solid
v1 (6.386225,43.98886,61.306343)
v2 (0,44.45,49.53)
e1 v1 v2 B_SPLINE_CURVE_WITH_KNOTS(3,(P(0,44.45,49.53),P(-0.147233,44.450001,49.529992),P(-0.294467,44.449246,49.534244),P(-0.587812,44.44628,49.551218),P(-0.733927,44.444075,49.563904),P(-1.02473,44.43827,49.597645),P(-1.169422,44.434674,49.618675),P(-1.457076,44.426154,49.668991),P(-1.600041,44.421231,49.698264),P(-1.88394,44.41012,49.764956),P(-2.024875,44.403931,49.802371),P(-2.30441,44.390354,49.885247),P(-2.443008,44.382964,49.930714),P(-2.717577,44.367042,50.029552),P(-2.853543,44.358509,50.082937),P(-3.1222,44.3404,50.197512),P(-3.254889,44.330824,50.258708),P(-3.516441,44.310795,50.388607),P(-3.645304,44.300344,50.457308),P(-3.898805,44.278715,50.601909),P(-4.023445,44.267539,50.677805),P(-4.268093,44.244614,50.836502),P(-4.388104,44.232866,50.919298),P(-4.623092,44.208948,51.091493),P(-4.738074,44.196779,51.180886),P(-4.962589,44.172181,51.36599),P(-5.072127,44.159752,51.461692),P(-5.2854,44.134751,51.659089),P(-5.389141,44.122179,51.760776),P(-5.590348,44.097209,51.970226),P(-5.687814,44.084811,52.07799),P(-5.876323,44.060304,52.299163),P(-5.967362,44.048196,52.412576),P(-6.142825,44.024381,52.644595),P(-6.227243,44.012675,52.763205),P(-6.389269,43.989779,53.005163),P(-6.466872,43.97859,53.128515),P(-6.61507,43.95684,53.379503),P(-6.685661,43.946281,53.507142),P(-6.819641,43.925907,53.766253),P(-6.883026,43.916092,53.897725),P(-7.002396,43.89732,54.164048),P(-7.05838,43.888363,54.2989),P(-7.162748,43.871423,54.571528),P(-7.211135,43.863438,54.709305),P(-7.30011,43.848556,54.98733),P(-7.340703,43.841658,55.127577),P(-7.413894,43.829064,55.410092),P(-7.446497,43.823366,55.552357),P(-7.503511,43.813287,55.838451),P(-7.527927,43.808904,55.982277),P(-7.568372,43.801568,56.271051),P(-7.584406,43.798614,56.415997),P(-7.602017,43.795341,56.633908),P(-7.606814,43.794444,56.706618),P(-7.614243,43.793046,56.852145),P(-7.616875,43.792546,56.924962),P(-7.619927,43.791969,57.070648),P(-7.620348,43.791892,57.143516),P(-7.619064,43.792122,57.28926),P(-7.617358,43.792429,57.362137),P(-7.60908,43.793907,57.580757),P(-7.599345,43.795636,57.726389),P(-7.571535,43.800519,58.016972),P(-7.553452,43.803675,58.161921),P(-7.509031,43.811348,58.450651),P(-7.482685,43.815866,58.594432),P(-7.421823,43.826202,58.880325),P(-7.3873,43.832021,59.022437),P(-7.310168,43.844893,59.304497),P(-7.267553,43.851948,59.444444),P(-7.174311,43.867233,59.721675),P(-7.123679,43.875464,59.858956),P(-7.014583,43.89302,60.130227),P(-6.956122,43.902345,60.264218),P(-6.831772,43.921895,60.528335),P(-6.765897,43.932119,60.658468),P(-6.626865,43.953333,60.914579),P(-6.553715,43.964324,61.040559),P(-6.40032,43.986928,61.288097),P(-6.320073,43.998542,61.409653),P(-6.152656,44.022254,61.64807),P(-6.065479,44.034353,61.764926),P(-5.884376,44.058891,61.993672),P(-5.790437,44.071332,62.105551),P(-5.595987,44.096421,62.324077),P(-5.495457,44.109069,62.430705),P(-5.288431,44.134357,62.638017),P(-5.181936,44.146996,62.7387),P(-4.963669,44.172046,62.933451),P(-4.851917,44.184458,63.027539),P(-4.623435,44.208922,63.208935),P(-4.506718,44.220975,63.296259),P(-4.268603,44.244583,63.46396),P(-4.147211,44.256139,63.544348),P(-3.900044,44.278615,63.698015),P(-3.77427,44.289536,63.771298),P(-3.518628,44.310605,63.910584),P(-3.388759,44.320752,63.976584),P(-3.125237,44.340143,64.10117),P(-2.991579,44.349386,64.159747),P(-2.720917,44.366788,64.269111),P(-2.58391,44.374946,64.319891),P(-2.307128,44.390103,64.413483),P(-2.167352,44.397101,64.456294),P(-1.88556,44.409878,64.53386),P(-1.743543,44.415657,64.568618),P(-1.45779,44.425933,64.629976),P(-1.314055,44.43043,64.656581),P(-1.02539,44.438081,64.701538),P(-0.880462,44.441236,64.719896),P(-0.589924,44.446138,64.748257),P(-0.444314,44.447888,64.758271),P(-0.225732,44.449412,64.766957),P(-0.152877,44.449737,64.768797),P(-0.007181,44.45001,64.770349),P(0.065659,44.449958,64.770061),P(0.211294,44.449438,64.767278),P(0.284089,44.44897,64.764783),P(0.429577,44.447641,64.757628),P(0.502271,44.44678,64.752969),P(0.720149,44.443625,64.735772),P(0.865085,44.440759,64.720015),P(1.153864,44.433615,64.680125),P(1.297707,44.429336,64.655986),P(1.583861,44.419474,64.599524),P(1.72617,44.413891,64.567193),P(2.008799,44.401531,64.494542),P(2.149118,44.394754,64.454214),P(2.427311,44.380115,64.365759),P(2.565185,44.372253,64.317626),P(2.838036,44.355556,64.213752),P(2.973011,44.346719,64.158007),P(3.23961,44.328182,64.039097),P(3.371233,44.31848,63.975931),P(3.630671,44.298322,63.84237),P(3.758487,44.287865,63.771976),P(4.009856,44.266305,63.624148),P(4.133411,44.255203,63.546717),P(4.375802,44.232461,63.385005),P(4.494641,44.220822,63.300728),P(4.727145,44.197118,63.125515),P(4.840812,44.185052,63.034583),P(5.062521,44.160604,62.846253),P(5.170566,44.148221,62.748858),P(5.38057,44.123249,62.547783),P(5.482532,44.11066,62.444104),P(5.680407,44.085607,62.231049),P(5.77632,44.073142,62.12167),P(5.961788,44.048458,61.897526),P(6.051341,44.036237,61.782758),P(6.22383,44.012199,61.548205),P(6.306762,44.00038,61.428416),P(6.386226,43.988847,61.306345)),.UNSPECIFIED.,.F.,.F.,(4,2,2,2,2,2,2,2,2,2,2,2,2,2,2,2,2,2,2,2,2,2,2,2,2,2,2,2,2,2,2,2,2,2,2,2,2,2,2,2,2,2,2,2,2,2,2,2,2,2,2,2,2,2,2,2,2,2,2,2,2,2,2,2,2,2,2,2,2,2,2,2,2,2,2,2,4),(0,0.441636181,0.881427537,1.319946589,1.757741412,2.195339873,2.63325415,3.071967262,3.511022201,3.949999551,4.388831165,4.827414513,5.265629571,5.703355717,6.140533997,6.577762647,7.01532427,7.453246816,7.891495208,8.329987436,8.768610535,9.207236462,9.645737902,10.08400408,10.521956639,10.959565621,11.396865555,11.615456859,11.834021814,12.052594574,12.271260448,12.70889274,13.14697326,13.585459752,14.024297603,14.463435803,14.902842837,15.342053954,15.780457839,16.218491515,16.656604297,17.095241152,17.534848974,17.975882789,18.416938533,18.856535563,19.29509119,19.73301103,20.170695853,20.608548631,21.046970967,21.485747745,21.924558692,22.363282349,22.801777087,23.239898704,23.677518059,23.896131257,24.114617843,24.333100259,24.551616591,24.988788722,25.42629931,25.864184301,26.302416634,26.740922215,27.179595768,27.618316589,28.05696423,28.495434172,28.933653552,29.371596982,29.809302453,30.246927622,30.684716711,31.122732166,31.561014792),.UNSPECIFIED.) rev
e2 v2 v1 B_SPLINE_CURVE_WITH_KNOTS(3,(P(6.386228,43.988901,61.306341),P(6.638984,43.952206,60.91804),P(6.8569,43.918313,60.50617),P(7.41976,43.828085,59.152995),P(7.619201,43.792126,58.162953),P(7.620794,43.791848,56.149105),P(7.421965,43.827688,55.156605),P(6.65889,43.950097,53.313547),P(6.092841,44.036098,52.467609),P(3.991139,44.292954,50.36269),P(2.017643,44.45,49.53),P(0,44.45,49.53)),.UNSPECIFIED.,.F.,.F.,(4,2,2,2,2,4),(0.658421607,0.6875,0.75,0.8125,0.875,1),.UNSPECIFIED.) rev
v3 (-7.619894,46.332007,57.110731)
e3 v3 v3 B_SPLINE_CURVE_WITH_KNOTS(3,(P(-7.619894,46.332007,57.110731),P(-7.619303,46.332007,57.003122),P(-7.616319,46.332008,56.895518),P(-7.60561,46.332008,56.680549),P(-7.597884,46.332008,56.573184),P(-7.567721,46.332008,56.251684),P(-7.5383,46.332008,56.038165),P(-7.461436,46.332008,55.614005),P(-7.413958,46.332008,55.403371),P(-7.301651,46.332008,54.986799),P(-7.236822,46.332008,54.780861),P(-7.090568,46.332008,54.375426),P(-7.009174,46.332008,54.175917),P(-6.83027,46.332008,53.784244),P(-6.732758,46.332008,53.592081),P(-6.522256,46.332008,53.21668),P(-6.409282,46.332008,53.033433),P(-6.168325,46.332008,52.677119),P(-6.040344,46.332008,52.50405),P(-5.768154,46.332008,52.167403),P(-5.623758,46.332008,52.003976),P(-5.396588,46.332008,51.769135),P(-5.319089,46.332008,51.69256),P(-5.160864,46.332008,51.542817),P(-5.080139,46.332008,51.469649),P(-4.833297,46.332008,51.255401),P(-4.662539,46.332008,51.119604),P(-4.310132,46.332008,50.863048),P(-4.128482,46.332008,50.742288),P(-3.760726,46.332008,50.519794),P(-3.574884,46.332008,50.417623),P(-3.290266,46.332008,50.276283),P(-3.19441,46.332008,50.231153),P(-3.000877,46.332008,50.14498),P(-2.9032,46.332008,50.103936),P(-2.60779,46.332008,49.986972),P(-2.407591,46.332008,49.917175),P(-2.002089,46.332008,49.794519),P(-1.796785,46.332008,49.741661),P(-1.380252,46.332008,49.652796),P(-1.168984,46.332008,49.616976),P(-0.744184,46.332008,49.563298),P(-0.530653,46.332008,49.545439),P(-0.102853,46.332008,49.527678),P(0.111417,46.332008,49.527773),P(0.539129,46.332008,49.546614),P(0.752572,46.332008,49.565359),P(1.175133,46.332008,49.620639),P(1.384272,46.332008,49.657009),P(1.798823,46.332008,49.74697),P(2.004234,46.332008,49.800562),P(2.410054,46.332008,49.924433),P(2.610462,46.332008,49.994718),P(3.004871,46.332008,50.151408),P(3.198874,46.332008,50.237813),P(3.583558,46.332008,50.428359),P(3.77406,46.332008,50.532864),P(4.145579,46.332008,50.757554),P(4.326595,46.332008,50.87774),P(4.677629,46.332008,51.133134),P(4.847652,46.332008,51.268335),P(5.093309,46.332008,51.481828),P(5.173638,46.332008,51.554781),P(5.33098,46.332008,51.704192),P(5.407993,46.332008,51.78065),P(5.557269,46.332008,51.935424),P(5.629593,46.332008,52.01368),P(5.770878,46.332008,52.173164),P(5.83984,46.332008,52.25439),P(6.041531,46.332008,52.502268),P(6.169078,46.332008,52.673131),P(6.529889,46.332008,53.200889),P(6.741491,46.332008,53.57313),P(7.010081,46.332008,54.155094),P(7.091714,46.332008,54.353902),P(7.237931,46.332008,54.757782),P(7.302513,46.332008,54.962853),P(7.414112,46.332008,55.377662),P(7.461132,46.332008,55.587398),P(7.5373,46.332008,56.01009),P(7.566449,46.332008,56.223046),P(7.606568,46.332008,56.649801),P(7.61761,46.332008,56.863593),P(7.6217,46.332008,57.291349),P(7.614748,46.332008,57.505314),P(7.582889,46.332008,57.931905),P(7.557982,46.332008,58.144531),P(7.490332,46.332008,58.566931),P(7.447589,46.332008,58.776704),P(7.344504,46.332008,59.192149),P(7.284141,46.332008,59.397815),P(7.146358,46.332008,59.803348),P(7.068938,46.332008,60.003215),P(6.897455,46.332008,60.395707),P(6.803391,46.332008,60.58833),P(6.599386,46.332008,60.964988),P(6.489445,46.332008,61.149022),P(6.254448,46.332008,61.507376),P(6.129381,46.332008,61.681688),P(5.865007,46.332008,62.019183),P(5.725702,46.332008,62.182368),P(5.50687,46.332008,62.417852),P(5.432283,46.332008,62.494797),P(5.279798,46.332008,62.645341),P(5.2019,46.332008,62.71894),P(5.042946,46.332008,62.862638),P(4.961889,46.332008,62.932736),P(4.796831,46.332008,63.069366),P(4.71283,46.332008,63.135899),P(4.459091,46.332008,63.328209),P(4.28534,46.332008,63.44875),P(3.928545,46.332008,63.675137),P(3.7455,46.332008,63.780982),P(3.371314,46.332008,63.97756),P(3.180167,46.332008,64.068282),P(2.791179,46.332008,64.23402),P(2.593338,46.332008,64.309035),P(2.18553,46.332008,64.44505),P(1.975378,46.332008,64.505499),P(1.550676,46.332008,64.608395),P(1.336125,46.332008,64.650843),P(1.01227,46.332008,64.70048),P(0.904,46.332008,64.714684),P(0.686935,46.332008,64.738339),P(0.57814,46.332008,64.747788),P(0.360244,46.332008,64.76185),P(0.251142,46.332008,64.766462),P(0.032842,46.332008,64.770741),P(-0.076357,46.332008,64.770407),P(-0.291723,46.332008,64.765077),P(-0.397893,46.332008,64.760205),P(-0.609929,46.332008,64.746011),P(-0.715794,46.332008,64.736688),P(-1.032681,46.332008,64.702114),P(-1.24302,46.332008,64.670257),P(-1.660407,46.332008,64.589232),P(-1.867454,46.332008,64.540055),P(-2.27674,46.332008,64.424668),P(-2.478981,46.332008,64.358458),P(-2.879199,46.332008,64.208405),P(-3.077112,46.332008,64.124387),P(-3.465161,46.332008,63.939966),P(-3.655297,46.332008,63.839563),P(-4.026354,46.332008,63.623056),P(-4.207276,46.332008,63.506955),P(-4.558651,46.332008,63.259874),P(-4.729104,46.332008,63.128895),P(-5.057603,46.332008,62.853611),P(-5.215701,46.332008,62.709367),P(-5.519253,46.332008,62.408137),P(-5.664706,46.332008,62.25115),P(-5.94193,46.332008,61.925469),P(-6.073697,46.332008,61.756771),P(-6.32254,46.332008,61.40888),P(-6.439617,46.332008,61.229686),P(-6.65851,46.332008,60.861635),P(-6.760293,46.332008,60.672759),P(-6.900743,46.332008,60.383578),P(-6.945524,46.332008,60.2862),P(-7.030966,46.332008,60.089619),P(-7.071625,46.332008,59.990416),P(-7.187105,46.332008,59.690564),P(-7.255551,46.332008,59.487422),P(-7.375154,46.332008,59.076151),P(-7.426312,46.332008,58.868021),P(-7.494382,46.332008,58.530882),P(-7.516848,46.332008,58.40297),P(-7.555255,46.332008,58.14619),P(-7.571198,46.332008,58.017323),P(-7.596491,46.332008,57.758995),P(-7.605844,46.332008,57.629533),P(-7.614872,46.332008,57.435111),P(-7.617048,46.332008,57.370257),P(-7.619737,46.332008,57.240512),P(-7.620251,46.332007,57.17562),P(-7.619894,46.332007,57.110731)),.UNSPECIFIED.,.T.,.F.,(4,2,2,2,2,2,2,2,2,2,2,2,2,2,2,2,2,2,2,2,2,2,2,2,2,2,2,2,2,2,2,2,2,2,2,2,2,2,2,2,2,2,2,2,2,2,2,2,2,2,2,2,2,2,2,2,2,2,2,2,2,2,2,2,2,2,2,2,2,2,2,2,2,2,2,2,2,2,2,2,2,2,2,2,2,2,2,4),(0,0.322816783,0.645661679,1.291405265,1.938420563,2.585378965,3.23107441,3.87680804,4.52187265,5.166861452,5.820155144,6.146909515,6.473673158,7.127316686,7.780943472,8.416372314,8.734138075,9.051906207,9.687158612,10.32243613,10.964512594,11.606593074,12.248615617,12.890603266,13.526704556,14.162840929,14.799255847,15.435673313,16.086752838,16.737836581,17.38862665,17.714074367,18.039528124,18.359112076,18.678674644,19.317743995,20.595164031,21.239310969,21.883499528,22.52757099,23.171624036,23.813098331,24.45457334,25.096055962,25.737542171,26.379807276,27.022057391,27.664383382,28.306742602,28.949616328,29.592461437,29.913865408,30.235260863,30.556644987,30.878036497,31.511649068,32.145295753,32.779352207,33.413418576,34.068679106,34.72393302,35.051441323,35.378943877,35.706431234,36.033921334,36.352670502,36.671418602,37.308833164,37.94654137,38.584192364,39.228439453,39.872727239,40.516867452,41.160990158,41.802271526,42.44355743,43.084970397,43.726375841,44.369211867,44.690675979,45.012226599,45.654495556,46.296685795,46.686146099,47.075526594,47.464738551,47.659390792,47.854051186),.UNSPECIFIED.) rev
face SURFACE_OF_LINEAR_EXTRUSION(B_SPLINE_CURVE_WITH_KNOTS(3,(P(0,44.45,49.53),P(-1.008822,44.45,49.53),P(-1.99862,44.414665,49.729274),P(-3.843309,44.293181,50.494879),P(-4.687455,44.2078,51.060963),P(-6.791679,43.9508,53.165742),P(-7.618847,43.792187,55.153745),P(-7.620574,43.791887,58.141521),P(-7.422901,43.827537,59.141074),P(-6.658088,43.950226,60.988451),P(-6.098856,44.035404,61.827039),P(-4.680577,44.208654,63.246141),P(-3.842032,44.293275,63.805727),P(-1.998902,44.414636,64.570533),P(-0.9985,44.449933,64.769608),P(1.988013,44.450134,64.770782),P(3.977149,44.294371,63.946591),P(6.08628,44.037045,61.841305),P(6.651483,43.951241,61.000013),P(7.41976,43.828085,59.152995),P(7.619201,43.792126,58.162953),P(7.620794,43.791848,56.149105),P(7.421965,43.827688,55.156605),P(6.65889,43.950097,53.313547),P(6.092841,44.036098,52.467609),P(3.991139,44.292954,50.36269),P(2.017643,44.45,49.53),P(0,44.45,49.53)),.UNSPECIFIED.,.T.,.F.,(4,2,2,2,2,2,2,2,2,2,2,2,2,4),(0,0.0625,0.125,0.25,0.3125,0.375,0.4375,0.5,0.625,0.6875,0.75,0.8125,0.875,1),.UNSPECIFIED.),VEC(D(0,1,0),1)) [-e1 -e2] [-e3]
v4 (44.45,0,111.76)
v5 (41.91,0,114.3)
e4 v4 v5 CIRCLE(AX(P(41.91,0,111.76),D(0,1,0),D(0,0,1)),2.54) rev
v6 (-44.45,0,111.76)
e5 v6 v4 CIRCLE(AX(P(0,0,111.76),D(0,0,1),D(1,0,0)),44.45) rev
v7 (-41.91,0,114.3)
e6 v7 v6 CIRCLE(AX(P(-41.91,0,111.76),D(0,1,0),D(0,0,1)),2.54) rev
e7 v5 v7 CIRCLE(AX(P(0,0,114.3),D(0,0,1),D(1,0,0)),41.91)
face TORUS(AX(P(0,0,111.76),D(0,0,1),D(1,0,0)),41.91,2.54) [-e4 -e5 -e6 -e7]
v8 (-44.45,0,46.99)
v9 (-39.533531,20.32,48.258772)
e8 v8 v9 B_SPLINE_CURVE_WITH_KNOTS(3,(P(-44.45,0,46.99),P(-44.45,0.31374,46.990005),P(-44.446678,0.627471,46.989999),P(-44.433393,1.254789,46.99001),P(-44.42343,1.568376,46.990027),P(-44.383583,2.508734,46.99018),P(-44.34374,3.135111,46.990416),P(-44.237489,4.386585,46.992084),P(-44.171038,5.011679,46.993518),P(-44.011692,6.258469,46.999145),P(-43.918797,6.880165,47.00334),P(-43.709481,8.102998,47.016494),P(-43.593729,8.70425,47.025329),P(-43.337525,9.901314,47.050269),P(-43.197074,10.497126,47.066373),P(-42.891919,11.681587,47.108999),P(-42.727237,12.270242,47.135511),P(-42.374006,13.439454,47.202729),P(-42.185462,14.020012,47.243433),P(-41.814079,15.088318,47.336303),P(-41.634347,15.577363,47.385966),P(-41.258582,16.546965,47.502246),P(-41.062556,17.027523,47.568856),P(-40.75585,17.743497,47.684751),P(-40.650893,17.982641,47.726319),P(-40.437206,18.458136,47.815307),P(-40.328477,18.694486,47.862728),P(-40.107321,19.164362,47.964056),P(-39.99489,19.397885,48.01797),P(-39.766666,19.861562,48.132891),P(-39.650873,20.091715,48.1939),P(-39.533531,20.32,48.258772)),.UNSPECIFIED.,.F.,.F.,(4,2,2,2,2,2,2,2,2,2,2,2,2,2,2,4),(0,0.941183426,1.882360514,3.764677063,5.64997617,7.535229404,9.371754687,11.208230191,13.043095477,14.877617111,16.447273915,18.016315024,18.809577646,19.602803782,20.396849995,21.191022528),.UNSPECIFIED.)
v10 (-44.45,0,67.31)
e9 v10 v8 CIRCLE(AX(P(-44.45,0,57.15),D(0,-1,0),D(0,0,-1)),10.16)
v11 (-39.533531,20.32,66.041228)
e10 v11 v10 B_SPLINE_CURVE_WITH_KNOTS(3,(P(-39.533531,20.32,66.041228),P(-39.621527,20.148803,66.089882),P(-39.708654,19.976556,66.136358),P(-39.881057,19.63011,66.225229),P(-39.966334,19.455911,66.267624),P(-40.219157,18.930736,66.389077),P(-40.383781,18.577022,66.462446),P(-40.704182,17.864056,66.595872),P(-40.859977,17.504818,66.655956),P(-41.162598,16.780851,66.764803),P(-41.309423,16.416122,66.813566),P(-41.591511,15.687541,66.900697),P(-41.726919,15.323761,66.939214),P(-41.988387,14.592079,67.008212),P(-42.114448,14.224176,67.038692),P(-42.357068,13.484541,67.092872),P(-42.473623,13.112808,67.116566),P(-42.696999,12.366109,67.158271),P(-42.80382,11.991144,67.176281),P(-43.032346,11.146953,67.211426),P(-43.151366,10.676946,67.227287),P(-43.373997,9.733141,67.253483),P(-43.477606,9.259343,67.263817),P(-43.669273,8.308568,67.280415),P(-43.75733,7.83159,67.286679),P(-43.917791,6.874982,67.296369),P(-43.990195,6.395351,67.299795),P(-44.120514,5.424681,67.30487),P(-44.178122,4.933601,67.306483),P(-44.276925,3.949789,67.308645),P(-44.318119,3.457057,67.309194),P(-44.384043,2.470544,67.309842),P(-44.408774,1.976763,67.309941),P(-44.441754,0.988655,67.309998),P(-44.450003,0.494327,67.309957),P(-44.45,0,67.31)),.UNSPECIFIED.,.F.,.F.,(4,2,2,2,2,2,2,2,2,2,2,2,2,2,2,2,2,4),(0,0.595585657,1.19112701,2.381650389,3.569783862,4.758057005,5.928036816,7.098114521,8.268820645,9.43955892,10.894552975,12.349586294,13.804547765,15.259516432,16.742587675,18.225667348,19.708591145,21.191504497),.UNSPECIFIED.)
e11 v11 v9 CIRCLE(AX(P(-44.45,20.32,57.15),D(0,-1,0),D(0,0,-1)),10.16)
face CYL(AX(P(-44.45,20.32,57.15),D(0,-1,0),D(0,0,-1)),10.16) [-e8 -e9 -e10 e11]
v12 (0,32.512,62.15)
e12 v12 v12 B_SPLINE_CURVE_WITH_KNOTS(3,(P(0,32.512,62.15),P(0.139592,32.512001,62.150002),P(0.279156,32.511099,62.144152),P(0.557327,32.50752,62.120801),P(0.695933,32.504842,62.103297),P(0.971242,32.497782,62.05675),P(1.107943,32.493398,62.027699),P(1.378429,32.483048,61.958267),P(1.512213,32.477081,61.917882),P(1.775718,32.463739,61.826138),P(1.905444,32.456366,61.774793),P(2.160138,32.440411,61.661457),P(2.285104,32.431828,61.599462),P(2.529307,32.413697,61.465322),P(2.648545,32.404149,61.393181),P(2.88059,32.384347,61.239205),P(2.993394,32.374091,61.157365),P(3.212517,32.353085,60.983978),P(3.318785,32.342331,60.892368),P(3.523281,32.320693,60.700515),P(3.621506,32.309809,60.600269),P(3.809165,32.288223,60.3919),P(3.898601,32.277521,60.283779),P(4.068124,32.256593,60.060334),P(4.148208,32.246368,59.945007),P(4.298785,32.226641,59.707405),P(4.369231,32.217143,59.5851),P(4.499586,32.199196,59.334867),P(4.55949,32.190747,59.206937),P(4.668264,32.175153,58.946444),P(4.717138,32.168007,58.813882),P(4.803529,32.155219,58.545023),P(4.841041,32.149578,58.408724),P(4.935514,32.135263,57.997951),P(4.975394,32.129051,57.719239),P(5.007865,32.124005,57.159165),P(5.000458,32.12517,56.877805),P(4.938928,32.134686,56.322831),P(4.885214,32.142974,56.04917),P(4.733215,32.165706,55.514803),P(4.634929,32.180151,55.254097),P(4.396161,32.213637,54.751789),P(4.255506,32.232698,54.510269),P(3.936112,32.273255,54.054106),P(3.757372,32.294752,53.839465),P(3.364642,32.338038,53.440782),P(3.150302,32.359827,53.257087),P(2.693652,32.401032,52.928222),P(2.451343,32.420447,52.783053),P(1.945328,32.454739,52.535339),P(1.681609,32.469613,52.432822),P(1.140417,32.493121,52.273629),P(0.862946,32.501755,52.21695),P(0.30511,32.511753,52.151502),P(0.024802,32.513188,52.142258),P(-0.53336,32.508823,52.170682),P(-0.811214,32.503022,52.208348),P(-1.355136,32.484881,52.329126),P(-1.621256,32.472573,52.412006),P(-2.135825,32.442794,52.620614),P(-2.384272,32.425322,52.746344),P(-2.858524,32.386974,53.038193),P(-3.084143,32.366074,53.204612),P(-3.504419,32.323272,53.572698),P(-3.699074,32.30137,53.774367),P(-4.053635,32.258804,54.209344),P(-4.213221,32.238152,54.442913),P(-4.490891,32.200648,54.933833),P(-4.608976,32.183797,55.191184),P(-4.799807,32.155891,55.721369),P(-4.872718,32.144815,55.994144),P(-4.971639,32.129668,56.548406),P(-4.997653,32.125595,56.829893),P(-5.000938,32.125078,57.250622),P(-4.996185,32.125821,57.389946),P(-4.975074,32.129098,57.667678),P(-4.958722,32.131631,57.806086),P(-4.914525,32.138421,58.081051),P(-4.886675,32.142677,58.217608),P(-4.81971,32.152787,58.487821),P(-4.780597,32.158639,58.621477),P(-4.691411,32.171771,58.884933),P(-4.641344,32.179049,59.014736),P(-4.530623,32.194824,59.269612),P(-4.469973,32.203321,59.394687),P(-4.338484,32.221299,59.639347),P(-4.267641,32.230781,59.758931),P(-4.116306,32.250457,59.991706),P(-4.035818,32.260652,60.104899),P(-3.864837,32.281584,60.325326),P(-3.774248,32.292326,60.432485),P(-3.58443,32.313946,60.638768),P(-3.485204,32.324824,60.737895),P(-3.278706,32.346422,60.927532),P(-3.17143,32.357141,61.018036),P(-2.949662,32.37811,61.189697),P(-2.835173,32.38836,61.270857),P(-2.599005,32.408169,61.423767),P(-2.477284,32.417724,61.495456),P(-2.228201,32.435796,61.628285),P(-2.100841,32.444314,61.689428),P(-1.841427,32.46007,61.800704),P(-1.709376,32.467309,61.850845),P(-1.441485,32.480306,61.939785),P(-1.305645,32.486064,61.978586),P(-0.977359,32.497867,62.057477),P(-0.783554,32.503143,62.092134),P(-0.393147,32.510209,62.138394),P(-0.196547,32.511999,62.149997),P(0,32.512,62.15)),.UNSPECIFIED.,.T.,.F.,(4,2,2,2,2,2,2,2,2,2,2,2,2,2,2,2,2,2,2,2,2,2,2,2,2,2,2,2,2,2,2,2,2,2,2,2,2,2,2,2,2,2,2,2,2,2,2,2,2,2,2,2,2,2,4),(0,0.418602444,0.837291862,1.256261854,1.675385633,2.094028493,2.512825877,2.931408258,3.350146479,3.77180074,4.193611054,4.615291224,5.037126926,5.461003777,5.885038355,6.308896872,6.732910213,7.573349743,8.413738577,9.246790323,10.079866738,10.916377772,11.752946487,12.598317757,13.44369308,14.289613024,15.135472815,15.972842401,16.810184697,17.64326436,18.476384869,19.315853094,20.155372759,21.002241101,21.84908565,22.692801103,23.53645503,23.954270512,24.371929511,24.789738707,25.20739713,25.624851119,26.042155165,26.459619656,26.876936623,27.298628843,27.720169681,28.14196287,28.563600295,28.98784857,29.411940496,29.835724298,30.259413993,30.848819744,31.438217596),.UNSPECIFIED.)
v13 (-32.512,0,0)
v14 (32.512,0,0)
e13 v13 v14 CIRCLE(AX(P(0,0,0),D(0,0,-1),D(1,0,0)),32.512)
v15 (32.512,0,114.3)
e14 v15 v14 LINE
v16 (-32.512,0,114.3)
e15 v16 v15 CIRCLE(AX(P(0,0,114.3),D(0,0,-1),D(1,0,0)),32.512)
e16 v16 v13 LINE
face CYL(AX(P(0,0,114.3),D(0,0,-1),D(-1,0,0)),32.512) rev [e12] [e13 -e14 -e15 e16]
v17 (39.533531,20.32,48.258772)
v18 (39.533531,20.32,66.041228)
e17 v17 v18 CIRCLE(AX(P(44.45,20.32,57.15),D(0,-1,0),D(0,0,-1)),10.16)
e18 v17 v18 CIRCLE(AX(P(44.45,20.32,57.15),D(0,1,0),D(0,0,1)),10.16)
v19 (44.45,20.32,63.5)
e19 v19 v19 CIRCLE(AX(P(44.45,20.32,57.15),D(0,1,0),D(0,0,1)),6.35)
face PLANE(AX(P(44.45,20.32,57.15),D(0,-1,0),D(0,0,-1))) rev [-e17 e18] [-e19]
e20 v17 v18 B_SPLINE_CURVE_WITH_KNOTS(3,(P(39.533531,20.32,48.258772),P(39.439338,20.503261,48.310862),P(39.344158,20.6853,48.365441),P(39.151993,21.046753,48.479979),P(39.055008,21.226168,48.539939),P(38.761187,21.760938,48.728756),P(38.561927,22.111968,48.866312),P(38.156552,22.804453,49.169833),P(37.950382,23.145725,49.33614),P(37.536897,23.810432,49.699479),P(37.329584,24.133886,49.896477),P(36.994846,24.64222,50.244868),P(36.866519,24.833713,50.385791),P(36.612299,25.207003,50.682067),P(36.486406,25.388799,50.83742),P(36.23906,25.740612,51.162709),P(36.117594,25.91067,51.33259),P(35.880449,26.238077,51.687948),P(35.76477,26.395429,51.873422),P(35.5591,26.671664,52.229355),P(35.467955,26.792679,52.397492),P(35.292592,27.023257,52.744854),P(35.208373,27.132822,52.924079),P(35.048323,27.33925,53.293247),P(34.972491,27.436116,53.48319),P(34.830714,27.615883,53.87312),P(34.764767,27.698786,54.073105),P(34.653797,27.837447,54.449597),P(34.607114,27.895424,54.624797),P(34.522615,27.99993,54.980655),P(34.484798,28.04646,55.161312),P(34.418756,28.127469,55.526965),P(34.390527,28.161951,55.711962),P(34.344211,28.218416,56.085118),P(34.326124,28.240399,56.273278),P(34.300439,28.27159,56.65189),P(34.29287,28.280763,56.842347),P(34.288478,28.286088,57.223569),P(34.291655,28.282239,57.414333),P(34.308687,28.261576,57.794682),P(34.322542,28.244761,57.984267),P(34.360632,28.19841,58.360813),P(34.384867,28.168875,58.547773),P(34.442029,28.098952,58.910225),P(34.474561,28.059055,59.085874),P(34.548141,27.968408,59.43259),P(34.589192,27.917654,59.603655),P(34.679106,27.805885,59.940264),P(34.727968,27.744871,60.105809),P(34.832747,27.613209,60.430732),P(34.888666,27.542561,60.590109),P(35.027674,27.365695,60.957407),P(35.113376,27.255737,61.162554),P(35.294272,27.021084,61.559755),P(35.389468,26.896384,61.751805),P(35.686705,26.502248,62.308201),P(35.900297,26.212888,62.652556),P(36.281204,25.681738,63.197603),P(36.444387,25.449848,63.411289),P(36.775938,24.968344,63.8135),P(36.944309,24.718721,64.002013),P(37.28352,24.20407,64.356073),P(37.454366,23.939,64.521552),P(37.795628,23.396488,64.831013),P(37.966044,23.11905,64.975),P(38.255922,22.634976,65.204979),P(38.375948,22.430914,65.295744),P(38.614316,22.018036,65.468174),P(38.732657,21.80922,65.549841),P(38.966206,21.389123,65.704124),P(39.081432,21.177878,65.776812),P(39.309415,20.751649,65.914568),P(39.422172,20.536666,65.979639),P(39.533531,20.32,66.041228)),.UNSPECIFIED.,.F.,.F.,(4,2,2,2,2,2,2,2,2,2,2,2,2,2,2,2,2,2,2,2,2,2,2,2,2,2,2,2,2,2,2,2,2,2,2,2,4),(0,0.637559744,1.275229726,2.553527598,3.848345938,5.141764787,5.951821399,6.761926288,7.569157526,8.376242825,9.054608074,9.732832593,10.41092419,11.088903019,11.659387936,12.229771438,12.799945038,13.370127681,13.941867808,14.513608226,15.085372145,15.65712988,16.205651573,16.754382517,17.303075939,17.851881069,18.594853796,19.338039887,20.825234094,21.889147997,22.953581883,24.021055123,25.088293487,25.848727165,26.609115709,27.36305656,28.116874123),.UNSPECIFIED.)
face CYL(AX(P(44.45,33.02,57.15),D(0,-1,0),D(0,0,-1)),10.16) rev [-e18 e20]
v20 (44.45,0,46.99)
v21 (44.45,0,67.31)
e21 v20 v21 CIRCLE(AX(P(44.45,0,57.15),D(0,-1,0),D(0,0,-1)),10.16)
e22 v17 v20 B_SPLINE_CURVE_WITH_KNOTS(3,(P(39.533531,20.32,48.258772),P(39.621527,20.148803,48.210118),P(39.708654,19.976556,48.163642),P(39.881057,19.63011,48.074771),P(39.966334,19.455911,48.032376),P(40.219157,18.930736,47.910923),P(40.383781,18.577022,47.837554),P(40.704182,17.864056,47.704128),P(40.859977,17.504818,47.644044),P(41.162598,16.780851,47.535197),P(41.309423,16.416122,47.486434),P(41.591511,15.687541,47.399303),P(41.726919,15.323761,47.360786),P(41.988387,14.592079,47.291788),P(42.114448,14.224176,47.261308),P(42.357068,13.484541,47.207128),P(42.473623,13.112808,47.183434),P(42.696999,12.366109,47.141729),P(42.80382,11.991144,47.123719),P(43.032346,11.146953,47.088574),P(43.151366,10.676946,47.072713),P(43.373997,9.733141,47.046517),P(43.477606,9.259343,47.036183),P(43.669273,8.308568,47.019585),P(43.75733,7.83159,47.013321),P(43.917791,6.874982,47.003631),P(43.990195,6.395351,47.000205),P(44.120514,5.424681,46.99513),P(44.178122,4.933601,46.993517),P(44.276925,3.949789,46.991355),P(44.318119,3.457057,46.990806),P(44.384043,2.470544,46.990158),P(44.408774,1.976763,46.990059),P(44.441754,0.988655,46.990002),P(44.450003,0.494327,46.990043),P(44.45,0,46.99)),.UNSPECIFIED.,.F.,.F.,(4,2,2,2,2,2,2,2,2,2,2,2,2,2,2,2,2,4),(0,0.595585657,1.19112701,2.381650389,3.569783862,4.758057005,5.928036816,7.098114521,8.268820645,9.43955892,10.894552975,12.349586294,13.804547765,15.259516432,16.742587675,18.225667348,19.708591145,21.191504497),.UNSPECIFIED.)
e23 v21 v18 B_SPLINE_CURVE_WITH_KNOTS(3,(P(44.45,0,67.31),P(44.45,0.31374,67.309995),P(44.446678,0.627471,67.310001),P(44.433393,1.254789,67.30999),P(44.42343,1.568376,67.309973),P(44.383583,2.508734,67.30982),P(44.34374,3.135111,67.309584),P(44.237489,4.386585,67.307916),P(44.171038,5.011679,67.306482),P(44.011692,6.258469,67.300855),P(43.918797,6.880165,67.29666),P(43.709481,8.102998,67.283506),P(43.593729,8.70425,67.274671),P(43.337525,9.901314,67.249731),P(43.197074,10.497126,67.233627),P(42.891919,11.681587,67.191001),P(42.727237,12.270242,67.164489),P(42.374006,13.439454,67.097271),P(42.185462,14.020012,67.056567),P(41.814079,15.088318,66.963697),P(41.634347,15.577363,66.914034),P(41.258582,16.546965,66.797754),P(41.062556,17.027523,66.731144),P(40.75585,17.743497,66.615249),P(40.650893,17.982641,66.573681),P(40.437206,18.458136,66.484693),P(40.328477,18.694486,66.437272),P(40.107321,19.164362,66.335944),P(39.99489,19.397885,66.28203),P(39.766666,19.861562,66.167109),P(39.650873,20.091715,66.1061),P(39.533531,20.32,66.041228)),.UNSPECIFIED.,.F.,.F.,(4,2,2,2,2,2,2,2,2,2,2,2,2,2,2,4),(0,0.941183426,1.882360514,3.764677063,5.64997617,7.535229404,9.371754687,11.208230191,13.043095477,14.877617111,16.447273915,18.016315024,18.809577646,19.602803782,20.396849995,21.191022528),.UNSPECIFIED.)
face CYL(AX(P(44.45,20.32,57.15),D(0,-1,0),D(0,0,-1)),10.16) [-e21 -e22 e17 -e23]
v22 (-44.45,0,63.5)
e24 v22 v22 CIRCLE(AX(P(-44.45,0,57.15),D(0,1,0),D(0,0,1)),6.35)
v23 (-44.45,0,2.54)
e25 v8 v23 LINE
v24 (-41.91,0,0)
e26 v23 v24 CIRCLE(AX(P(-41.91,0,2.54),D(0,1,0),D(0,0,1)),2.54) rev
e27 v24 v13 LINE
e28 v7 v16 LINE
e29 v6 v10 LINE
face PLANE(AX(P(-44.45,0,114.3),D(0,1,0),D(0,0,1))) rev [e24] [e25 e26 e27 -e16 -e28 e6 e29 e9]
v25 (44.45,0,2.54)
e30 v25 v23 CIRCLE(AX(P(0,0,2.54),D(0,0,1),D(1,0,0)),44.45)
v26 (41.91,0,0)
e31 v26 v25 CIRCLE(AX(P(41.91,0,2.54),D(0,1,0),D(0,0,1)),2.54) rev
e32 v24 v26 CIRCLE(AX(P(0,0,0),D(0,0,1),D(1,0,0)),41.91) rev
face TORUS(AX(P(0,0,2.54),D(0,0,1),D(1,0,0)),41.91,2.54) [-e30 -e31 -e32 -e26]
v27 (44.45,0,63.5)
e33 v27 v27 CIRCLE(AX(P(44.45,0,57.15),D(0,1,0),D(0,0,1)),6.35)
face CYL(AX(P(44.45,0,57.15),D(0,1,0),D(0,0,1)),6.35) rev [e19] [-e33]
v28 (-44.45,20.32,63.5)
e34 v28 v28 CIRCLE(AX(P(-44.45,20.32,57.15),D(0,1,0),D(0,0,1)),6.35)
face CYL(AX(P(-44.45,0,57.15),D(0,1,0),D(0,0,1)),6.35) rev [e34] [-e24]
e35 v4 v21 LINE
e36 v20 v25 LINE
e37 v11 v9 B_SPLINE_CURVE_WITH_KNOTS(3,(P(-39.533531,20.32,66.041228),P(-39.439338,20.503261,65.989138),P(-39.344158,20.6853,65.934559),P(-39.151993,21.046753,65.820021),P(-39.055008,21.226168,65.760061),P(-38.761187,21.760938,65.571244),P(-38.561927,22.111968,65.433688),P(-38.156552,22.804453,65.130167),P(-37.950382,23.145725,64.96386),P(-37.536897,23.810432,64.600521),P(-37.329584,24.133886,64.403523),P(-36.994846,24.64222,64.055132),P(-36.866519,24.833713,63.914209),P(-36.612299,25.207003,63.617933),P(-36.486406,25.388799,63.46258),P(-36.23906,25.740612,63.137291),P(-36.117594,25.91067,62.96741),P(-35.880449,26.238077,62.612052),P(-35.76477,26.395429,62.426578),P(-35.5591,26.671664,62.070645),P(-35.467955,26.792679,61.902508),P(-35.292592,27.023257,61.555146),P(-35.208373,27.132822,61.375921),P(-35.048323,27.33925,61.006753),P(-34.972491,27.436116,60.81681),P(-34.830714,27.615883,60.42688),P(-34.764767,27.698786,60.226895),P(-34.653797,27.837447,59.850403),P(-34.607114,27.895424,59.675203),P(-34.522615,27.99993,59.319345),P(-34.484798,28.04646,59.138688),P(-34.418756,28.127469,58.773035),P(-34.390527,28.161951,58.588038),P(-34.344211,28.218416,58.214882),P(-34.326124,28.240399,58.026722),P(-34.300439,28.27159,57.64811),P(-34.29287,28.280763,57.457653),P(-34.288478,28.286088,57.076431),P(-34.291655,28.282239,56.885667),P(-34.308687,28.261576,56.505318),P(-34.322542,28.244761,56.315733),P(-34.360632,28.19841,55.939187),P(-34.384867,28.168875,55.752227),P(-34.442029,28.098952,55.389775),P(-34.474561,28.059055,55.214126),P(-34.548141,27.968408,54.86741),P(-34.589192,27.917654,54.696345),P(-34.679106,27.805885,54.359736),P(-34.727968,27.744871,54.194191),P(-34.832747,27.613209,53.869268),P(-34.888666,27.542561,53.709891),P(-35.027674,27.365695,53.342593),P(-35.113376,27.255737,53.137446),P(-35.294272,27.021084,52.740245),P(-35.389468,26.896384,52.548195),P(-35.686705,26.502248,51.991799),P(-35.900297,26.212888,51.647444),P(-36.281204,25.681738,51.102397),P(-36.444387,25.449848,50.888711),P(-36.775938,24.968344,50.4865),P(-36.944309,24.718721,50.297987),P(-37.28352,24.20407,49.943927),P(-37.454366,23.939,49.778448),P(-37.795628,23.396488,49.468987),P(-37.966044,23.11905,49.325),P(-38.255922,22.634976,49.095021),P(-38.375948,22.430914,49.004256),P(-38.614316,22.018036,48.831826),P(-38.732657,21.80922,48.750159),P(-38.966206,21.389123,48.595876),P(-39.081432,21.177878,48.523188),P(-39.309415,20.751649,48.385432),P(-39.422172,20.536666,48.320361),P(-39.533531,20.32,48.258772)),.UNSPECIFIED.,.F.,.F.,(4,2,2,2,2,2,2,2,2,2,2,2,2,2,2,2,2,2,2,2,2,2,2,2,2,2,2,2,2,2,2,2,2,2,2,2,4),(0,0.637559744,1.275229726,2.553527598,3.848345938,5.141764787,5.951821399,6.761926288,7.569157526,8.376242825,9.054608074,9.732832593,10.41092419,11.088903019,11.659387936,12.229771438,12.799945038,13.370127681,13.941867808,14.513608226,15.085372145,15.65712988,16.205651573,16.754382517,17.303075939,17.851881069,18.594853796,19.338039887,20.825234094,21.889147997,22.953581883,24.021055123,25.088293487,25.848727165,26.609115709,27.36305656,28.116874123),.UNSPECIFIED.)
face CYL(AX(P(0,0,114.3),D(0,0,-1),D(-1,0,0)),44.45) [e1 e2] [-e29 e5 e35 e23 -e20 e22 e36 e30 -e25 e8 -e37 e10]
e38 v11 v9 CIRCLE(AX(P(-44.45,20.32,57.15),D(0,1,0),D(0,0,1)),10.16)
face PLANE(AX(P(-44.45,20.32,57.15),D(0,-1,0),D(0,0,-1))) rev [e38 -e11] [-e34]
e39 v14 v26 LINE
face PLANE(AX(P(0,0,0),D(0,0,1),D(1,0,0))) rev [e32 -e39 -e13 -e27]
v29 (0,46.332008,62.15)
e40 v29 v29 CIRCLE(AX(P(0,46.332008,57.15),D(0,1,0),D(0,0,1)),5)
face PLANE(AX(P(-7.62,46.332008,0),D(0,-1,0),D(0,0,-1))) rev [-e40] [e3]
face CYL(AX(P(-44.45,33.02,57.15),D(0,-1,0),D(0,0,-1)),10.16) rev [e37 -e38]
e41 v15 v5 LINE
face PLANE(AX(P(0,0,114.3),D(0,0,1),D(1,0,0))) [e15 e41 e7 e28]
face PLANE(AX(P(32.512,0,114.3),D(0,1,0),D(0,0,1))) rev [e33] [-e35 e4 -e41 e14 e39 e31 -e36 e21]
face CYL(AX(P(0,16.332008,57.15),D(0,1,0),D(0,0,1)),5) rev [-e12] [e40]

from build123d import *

# Parameters (mm, degrees)
BOSS_EXTRUDE1_DEPTH     = 114.3
SKETCH3_R               = 10.16
BOSS_EXTRUDE2_DEPTH     = 20.32
SKETCH5_R               = 10.16
CUT_EXTRUDE1_DEPTH      = 12.7
FILLET2_R               = 2.54
SKETCH6_R               = 6.35
CUT_EXTRUDE2_DEPTH      = 129.953476168
BOSS_EXTRUDE3_START     = 43.791955851
BOSS_EXTRUDE3_DEPTH     = 3.198044249
BOSS_EXTRUDE3_START_2   = 49
BOSS_EXTRUDE3_2_DEPTH   = 17
CUT_EXTRUDE3_DEPTH      = 136.11033375
CUT_EXTRUDE3_DEPTH_BACK = 136.11033375
SKETCH8_W               = 15.239999981
SKETCH8_H               = 4.021184516
CUT_EXTRUDE4_DEPTH      = 135.882901337
CUT_EXTRUDE4_DEPTH_BACK = 135.882901337
SKETCH10_R              = 3.175
SKETCH11_R              = 5
CUT_EXTRUDE5_DEPTH      = 30


with BuildPart() as part:
    # Sketch2 → Boss-Extrude1 (new body)
    with BuildSketch(Plane.XY):
        with BuildLine():
            Line((-44.45, 0), (-32.512, 0))
            ThreePointArc((-32.512, 0), (0, 32.512), (32.512, 0))
            Line((32.512, 0), (44.45, 0))
            ThreePointArc((44.45, 0), (0, 44.45), (-44.45, 0))
        make_face()
    extrude(amount=BOSS_EXTRUDE1_DEPTH)

    # Sketch3 → Boss-Extrude2 (add)
    with BuildSketch(Plane.XZ):
        with Locations((44.45, 57.15)):
            Circle(SKETCH3_R)
        with Locations((-44.45, 57.15)):
            Circle(SKETCH3_R)
    extrude(amount=-BOSS_EXTRUDE2_DEPTH)

    # Sketch5 → Cut-Extrude1 (cut)
    with BuildSketch(Plane(origin=(0, 20.32, 0), x_dir=(1, 0, 0), z_dir=(0, 1, 0))):
        with Locations((44.45, -57.15)):
            Circle(SKETCH5_R)
        with Locations((-44.45, -57.15)):
            Circle(SKETCH5_R)
    extrude(amount=CUT_EXTRUDE1_DEPTH, mode=Mode.SUBTRACT)

    # Fillet2
    fillet2_edges = [part.edges().sort_by_distance(p)[0] for p in [
        (0, 44.45, 114.3),
        (0, 44.45, 0),
    ]]
    fillet(fillet2_edges, radius=FILLET2_R)

    # Sketch6 → Cut-Extrude2 (cut, through all)
    with BuildSketch(Plane(origin=(0, 20.32, 0), x_dir=(1, 0, 0), z_dir=(0, 1, 0))):
        with Locations(Location((44.45, -57.15, 0), (0, 0, 270))):
            Circle(SKETCH6_R)
        with Locations(Location((-44.45, -57.15, 0), (0, 0, 270))):
            Circle(SKETCH6_R)
    extrude(amount=-CUT_EXTRUDE2_DEPTH, mode=Mode.SUBTRACT)

    # Boss-Extrude3: read off the stored shape, not the designer's step
    # Boss-Extrude3 outline → Boss-Extrude3 (add)
    with BuildSketch(Plane(origin=(0, 0, 0), x_dir=(1, 0, 0), z_dir=(0, 1, 0)).offset(BOSS_EXTRUDE3_START)):
        with BuildLine():
            add(Edge.make_bspline(
                [(0, -49.53), (-1.008821651, -49.53), (-1.998619935, -49.72927394), (-3.843308667, -50.494879009), (-4.687454894, -51.060962916), (-6.791679377, -53.165741576), (-7.618847434, -55.15374527), (-7.620574374, -58.141520807), (-7.42290115, -59.141073642), (-6.658087545, -60.988450986), (-6.098856032, -61.827039285), (-4.680577167, -63.2461413), (-3.842032005, -63.805727128), (-1.998902378, -64.570532515), (-0.998499986, -64.769608068), (1.988013472, -64.770782097), (3.977148932, -63.946590903), (6.086279789, -61.841304586), (6.651483441, -61.000012912), (7.419760337, -59.152994739), (7.619200893, -58.162953427), (7.620794336, -56.149105114), (7.421964798, -55.156604804), (6.658890114, -53.313547431), (6.092840739, -52.467609132), (3.99113944, -50.362690075), (2.017643301, -49.53), (0, -49.53)],
                knots=[0, 0, 0, 0, 0.0625, 0.0625, 0.125, 0.125, 0.25, 0.25, 0.3125, 0.3125, 0.375, 0.375, 0.4375, 0.4375, 0.5, 0.5, 0.625, 0.625, 0.6875, 0.6875, 0.75, 0.75, 0.8125, 0.8125, 0.875, 0.875, 1, 1, 1, 1], degree=3))
        make_face()
    extrude(amount=BOSS_EXTRUDE3_DEPTH)

    # Boss-Extrude3 2 outline → Boss-Extrude3 2 (cut)
    with BuildSketch(Plane.XY.offset(BOSS_EXTRUDE3_START_2)):
        with BuildLine():
            Line((-9, 46.09176164), (-7.623050959, 46.33145572))
            ThreePointArc((-7.623050959, 46.33145572), (-3.825721713, 46.825057902), (0, 46.99))
            Line((0, 46.99), (-9, 46.9900001))
            Line((-9, 46.9900001), (-9, 46.09176164))
        make_face()
        with BuildLine():
            Line((9, 46.9900001), (0, 46.99))
            ThreePointArc((0, 46.99), (3.825781455, 46.825052741), (7.623169112, 46.331435152))
            Line((7.623169112, 46.331435152), (9, 46.091757812))
            Line((9, 46.091757812), (9, 46.9900001))
        make_face()
    extrude(amount=BOSS_EXTRUDE3_2_DEPTH, mode=Mode.SUBTRACT)

    # Sketch8 → Cut-Extrude3 (cut, two sides: drawn at the far end of the back side and taken through both)
    with BuildSketch(Plane.XY.offset(114.3).offset(-CUT_EXTRUDE3_DEPTH_BACK)):
        with Locations((9e-09, 48.342600124)):
            Rectangle(SKETCH8_W, SKETCH8_H)
    extrude(amount=CUT_EXTRUDE3_DEPTH + CUT_EXTRUDE3_DEPTH_BACK, mode=Mode.SUBTRACT)

    # Sketch10 → Cut-Extrude4 (cut, two sides: drawn at the far end of the back side and taken through both)
    with BuildSketch(Plane(origin=(0, 46.332007866, 0), x_dir=(1, 0, 0), z_dir=(0, 1, 0)).offset(-CUT_EXTRUDE4_DEPTH_BACK)):
        with Locations(Location((0, -57.15, 0), (0, 0, 270))):
            Circle(SKETCH10_R)
    extrude(amount=CUT_EXTRUDE4_DEPTH + CUT_EXTRUDE4_DEPTH_BACK, mode=Mode.SUBTRACT)

    # Sketch11 → Cut-Extrude5 (cut)
    with BuildSketch(Plane(origin=(0, 46.332007866, 0), x_dir=(1, 0, 0), z_dir=(0, 1, 0))):
        with Locations(Location((0, -57.15, 0), (0, 0, 270))):
            Circle(SKETCH11_R)
    extrude(amount=-CUT_EXTRUDE5_DEPTH, mode=Mode.SUBTRACT)


solid = part.part
